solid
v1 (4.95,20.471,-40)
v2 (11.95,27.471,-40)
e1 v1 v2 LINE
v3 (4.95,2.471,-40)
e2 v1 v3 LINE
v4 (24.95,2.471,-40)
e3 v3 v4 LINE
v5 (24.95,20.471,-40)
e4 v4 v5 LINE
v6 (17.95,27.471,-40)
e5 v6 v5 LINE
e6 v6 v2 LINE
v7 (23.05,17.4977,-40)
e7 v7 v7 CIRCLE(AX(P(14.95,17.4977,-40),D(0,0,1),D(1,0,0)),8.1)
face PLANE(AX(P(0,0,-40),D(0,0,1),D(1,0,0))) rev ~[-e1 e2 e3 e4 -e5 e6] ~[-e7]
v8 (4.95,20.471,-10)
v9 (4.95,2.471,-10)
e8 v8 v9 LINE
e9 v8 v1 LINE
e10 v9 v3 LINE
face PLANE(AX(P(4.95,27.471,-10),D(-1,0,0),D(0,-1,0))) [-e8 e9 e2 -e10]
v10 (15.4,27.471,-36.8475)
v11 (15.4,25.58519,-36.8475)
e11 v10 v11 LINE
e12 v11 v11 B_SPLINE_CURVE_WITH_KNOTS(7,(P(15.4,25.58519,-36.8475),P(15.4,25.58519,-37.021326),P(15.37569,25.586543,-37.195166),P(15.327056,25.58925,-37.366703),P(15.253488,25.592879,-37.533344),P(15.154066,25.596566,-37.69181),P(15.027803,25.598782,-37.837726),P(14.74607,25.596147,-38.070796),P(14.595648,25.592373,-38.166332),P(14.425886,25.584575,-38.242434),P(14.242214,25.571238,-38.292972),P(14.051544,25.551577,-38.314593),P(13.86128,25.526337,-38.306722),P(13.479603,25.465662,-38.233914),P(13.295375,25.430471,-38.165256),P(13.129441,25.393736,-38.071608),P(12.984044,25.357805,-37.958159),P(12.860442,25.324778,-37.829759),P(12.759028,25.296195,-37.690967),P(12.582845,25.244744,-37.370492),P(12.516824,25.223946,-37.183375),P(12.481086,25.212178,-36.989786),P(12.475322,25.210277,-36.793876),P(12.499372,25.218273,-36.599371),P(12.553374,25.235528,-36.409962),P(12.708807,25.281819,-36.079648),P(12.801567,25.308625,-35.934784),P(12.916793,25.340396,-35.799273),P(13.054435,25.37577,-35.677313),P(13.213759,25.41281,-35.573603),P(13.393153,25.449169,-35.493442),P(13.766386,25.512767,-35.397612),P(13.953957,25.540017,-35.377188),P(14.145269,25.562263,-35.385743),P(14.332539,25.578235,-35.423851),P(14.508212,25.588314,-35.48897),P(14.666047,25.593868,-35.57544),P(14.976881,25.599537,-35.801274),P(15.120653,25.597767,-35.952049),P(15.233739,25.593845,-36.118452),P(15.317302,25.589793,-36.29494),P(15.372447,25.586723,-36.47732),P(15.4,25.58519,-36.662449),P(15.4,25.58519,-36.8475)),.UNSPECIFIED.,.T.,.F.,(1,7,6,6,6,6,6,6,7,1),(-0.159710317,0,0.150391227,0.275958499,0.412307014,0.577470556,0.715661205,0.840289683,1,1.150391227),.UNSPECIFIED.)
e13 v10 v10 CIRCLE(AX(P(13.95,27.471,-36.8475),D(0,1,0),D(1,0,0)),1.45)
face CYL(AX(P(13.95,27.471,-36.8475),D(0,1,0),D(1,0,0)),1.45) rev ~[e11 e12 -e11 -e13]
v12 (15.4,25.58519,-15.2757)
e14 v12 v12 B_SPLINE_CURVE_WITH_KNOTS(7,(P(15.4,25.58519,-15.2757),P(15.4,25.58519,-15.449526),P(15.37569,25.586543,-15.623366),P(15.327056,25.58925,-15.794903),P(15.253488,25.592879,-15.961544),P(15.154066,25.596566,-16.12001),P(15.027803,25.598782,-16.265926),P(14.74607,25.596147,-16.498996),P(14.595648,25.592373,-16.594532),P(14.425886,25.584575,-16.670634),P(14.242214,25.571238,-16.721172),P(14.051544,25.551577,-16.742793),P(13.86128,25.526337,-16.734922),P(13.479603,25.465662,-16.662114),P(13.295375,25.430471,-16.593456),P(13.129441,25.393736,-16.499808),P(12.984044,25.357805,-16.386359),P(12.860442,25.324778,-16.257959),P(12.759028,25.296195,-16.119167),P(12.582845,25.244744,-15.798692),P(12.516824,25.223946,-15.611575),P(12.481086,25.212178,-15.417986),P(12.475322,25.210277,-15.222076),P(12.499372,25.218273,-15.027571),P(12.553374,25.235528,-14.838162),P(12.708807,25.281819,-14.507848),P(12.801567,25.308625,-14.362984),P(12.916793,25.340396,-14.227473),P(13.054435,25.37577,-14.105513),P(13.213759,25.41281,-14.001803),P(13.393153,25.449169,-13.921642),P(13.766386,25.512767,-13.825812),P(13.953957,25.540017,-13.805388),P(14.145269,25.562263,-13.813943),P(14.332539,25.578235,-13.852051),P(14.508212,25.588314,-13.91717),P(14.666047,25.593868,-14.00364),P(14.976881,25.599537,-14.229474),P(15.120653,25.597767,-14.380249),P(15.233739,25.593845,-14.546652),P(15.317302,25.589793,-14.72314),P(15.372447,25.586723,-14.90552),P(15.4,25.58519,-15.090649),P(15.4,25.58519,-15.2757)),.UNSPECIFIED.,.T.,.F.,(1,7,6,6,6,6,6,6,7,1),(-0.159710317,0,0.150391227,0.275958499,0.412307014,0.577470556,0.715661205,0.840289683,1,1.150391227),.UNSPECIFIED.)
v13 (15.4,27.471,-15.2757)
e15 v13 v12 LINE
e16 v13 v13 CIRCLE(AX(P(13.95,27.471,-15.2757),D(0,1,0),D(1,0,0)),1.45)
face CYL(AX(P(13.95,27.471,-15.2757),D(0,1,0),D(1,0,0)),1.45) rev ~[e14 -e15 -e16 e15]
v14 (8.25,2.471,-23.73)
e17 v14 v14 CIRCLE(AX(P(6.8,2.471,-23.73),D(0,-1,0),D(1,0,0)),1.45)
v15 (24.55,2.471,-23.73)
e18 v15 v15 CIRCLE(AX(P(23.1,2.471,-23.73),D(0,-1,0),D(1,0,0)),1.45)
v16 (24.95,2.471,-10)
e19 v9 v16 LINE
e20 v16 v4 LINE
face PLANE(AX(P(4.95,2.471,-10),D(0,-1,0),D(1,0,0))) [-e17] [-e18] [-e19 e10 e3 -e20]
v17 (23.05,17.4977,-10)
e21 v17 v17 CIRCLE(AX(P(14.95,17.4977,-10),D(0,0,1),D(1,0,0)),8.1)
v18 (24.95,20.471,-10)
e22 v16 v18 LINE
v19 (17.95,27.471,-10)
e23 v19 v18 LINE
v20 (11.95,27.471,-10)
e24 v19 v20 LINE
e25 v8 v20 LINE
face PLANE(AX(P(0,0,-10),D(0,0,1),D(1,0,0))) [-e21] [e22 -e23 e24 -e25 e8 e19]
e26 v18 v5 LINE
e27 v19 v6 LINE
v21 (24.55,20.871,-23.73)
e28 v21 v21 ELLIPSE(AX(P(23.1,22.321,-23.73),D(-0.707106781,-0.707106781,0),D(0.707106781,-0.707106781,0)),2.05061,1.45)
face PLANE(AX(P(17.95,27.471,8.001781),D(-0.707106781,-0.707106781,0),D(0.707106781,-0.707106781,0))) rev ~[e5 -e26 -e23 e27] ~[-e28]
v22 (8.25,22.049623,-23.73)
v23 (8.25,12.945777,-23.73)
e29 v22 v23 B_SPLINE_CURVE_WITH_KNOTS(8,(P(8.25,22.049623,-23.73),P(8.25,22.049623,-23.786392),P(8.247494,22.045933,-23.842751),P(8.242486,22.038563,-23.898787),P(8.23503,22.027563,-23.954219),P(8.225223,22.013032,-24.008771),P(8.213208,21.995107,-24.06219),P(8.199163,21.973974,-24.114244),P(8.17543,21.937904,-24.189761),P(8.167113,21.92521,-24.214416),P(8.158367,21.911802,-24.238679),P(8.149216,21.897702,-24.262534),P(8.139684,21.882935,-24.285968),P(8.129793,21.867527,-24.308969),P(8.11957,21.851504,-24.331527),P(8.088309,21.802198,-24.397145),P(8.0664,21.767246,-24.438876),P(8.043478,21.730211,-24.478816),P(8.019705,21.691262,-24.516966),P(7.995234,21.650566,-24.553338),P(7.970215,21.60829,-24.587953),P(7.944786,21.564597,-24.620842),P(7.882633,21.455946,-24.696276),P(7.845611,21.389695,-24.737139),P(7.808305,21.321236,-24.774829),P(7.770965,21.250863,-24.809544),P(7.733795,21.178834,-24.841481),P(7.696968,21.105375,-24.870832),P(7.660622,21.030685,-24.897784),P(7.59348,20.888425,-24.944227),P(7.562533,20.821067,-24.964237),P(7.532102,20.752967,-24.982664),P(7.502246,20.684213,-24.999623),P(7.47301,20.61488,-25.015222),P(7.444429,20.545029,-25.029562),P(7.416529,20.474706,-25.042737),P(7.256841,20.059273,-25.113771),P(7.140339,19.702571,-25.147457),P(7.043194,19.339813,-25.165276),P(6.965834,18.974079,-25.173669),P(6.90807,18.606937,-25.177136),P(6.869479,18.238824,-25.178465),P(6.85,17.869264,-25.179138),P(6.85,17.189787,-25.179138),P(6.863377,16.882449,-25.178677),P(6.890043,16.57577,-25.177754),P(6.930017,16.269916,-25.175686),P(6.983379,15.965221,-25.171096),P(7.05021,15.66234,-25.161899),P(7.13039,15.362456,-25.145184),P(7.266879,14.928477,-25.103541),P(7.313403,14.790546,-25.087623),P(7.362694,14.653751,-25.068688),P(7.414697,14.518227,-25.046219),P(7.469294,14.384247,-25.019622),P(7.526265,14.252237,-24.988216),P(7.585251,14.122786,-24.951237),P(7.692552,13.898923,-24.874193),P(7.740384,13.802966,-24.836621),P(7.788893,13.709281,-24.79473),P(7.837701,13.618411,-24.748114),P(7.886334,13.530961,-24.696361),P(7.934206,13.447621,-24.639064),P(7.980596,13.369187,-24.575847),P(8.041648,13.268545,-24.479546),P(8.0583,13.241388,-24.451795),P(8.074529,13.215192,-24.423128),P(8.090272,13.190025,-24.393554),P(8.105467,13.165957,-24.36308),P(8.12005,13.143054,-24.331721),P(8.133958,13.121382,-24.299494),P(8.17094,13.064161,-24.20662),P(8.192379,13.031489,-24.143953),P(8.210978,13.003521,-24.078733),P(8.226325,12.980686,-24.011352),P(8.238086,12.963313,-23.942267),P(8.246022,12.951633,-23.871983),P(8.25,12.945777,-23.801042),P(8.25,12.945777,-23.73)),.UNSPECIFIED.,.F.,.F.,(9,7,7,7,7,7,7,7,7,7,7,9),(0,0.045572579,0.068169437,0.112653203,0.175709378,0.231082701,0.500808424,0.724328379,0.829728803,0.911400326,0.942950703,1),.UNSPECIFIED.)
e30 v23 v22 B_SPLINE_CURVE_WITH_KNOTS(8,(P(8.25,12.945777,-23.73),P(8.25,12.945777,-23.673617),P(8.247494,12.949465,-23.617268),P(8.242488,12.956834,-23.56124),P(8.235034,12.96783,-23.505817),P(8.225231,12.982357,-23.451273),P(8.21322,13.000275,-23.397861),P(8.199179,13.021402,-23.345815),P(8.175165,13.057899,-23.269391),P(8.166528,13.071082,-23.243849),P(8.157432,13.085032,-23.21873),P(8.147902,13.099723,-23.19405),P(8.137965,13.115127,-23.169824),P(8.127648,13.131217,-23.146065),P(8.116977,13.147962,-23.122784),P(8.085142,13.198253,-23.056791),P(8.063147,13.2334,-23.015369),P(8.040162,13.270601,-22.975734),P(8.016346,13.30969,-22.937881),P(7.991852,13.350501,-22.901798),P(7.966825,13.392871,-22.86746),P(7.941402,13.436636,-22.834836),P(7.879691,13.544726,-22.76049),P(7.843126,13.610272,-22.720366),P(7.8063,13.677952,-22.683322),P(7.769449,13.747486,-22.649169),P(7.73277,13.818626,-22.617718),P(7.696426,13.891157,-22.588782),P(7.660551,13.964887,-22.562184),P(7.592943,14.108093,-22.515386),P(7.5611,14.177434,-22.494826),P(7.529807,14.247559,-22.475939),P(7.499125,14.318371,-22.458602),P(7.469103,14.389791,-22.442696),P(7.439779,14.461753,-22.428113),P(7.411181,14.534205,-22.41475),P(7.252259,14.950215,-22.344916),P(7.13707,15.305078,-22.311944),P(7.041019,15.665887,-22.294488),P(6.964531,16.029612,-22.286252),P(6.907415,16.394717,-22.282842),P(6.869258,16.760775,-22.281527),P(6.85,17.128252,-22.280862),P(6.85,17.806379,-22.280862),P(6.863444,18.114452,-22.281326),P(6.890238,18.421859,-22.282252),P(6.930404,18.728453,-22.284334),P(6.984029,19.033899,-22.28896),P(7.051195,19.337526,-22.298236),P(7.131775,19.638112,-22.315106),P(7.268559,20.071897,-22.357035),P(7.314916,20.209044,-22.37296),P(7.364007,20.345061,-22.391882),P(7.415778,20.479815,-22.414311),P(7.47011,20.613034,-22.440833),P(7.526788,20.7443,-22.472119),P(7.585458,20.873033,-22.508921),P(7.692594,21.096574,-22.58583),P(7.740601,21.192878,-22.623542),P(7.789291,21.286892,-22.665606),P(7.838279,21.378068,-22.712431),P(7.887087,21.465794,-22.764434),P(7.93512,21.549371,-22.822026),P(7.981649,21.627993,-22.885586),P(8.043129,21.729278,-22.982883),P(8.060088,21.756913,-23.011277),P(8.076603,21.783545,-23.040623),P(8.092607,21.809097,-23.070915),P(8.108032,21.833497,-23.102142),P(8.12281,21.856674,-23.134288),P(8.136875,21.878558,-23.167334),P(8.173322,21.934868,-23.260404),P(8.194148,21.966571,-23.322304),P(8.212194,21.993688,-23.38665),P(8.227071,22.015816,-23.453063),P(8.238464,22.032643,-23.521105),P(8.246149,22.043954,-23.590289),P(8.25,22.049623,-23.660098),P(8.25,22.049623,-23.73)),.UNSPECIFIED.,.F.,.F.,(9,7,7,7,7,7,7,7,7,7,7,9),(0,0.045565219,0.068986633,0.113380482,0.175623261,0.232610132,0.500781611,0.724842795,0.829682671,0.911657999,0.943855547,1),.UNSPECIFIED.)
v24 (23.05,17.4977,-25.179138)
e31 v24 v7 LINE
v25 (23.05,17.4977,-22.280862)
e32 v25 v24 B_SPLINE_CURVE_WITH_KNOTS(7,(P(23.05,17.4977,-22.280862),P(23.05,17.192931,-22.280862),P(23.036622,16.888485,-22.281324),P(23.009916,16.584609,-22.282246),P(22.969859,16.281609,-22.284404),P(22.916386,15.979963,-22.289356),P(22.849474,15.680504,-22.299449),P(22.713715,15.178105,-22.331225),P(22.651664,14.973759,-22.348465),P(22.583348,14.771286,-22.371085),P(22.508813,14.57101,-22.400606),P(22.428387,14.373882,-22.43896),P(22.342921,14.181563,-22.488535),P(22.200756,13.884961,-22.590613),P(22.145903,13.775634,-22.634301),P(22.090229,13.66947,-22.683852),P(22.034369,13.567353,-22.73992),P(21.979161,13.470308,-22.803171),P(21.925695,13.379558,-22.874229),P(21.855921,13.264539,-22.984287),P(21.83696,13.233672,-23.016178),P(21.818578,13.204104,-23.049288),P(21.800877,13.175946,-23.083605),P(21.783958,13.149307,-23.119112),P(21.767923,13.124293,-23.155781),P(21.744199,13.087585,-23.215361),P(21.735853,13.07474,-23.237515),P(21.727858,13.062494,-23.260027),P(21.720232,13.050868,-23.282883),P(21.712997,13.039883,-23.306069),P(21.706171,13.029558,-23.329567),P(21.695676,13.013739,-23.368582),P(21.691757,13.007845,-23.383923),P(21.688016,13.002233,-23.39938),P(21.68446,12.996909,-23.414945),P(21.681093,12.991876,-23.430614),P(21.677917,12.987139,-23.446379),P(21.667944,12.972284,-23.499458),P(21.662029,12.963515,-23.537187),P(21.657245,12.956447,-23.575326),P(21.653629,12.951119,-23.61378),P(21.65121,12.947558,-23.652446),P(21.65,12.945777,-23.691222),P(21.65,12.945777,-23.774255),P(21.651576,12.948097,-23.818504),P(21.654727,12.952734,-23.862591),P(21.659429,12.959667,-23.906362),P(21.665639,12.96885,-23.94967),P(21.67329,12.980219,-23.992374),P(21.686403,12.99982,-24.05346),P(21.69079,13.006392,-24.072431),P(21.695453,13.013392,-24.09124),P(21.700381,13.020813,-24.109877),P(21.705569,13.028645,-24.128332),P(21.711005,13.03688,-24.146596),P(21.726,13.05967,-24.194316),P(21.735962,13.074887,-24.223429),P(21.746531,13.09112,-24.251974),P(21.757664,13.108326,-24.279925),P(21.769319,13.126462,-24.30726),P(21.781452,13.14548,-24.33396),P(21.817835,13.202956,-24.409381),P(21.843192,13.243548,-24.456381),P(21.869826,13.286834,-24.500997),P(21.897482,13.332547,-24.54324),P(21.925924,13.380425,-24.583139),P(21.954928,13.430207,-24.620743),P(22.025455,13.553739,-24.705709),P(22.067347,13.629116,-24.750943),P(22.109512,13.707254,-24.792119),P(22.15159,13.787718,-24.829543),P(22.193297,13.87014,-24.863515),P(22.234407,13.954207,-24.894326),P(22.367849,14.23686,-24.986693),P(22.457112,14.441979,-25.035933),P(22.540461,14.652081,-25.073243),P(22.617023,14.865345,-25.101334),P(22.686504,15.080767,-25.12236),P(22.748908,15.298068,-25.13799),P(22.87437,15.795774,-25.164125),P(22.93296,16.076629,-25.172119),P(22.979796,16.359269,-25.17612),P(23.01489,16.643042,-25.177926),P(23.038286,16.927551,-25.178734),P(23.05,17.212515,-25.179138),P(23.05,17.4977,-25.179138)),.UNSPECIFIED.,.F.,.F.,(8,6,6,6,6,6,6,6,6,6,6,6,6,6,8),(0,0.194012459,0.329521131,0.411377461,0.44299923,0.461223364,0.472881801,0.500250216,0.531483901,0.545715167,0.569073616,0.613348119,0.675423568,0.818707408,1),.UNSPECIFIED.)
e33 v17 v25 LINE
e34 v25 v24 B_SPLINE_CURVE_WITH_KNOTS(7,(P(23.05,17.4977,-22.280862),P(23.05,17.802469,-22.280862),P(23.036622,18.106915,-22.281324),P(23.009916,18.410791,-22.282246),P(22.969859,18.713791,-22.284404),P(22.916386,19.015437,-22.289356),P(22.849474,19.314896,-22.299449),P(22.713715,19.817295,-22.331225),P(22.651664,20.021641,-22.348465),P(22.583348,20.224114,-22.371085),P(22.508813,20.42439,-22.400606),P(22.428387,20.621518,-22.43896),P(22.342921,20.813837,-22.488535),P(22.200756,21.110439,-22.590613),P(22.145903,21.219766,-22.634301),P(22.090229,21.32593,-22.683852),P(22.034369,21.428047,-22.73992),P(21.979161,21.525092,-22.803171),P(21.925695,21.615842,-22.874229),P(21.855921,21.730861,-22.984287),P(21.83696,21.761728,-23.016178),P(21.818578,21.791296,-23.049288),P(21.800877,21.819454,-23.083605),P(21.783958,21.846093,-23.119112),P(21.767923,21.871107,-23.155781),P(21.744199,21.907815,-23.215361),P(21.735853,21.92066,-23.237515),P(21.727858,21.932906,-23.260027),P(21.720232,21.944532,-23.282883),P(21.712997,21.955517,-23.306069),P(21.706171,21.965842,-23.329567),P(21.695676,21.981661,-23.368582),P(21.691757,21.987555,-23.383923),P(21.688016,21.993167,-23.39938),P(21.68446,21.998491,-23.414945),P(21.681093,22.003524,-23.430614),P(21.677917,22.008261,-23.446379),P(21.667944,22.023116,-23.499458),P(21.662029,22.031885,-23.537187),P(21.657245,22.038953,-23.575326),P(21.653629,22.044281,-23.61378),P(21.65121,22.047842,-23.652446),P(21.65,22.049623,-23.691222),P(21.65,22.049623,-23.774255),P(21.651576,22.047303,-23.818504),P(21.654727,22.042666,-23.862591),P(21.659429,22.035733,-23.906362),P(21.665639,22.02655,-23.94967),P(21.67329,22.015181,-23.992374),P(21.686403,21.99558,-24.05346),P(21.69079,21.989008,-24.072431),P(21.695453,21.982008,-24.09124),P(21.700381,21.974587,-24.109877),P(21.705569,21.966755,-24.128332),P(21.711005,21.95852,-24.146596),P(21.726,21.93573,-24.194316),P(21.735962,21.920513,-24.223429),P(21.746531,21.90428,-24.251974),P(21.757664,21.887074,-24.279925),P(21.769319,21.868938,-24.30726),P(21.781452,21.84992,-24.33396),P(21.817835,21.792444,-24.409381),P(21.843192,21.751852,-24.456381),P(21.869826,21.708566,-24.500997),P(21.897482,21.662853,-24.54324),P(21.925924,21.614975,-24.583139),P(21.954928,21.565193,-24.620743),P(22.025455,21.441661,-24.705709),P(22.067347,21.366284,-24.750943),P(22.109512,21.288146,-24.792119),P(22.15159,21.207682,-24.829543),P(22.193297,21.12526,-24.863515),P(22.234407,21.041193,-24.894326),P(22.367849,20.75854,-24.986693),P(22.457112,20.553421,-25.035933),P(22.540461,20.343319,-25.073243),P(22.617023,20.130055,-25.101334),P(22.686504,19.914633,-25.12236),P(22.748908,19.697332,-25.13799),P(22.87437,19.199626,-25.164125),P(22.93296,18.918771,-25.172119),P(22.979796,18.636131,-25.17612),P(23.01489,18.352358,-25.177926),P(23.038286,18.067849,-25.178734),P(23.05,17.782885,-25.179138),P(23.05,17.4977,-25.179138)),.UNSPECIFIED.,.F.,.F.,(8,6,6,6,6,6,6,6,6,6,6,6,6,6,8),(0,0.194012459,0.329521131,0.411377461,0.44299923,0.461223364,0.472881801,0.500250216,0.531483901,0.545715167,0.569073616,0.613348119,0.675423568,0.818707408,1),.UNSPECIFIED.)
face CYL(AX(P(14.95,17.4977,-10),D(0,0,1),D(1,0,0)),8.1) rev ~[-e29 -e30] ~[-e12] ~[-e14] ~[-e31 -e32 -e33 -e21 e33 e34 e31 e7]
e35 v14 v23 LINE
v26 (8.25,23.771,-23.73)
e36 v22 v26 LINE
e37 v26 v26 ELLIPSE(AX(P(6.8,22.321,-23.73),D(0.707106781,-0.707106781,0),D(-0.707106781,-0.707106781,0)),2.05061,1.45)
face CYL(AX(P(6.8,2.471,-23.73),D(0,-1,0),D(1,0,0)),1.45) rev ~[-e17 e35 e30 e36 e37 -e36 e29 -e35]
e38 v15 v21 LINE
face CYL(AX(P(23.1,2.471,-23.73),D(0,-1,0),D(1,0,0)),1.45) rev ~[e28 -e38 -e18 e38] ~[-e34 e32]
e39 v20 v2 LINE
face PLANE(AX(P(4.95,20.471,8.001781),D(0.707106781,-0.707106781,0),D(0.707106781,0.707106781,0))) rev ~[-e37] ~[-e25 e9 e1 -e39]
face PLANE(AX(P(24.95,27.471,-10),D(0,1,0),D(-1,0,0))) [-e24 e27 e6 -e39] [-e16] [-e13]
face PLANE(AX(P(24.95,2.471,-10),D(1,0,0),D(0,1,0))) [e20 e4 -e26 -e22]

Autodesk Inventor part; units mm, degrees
ref_plane "YZ Plane" through (0, 0, 0) normal (1, 0, 0) x (0, 1, 0)
ref_plane "XZ Plane" through (0, 0, 0) normal (0, 1, 0) x (-1, 0, 0)
ref_plane "XY Plane" through (0, 0, 0) normal (0, 0, 1) x (1, 0, 0)
ref_plane "Work Plane1" through (0, 0, 0) normal (0, 0, 1) x (1, 0, 0)
ref_plane "Work Plane2" through (0, 0, -10) normal (0, 0, 1) x (1, 0, 0)
sketch "Sketch1" plane through (0, 0, -10) normal (0, 0, 1) x (1, 0, 0)
  circle A0 centre (14.95, 17.4977) radius 7.15 projected
  line L0 (0, 2.471) -> (29.9, 2.471) projected
  line L1 (0, 2.471) -> (0, 18.471) projected
  line L2 (0, 18.471) -> (-2, 18.471) projected
  line L3 (-2, 18.471) -> (-2, -1.5) projected
  line L4 (29.9, -1.5) -> (-2, -1.5) projected
  line L5 (29.9, -1.5) -> (29.9, 2.471) projected
  line L6 (4.95, 2.471) -> (24.95, 2.471)
  line L7 (24.95, 2.471) -> (24.95, 27.471)
  line L8 (24.95, 27.471) -> (4.95, 27.471)
  line L9 (4.95, 27.471) -> (4.95, 2.471)
  circle A1 centre (14.95, 17.4977) radius 8.1
  point P0 (0, 0)
  dimension "d6" = 20
  dimension "d7" = 25
  dimension "d8" = 10
  dimension "d23" = 16.2
extrude "Extrusion1" add sketch "Sketch1" against normal blind 30 contours L9 L8 L7 L0
sketch "Sketch2" plane through (4.95, 2.471, -10) normal (0, -1, 0) x (1, 0, 0)
  circle A0 centre (18.15, -13.73) radius 2.45 projected
  circle A1 centre (1.85, -13.73) radius 2.75 projected
  circle A2 centre (18.15, -13.73) radius 1.45
  circle A3 centre (1.85, -13.73) radius 1.45
  point P0 (-4.95, 10)
  dimension "d10" = 2.9
  dimension "d11" = 2.9
extrude "Extrusion2" cut sketch "Sketch2" against normal through all contours A2 | A3
chamfer "Chamfer1" distance 7 angle 45 2 edges at (24.95, 27.471, -25) (4.95, 27.471, -25)
sketch "Sketch3" plane through (11.95, 27.471, -10) normal (0, 1, 0) x (1, 0, 0)
  line L0 (0, 0) -> (0, 30) projected
  line L1 (6, 0) -> (0, 0) projected
  line L2 (6, 30) -> (6, 0) projected
  line L3 (0, 30) -> (6, 30) projected
  circle A0 centre (2, 5.2757) radius 1.45
  circle A1 centre (2, 26.8475) radius 1.45
  point P0 (-11.95, -10)
  dimension "d17" = 2.9
  dimension "d18" = 2.9
extrude "Extrusion3" cut sketch "Sketch3" against normal blind 10 contours A0 | A1
ref_plane "Work Plane3" through (0, 27.471, -10) normal (0, -0.7071068, 0.7071068) x (1, 0, 0)
ref_plane "Work Plane4" through (11.95, 27.471, -10) normal (0, 0.7071068, 0.7071068) x (1, 0, 0)
ref_plane "Work Plane5" through (14.95, 2.471, -10) normal (1, 0, 0) x (0, 0, -1)
sketch "Sketch5" plane through (14.95, 2.471, -10) normal (1, 0, 0) x (0, 0, -1)
  line L0 (0, 23.1268) -> (30, 23.1268) projected
  line L1 (0, 6.9268) -> (30, 6.9268) projected
  line L2 (0, 23.1268) -> (-4.2183, 23.1268)
  line L3 (-4.2183, 23.1268) -> (24.7731, 52.1181)
  line L4 (24.7731, 52.1181) -> (24.7731, 23.1268)
  point P0 (-10, -2.471)
  dimension "d21" = 41
  dimension "d22" = 45
properties part number "cellSTORM_v5_bluelaser_adapter"
